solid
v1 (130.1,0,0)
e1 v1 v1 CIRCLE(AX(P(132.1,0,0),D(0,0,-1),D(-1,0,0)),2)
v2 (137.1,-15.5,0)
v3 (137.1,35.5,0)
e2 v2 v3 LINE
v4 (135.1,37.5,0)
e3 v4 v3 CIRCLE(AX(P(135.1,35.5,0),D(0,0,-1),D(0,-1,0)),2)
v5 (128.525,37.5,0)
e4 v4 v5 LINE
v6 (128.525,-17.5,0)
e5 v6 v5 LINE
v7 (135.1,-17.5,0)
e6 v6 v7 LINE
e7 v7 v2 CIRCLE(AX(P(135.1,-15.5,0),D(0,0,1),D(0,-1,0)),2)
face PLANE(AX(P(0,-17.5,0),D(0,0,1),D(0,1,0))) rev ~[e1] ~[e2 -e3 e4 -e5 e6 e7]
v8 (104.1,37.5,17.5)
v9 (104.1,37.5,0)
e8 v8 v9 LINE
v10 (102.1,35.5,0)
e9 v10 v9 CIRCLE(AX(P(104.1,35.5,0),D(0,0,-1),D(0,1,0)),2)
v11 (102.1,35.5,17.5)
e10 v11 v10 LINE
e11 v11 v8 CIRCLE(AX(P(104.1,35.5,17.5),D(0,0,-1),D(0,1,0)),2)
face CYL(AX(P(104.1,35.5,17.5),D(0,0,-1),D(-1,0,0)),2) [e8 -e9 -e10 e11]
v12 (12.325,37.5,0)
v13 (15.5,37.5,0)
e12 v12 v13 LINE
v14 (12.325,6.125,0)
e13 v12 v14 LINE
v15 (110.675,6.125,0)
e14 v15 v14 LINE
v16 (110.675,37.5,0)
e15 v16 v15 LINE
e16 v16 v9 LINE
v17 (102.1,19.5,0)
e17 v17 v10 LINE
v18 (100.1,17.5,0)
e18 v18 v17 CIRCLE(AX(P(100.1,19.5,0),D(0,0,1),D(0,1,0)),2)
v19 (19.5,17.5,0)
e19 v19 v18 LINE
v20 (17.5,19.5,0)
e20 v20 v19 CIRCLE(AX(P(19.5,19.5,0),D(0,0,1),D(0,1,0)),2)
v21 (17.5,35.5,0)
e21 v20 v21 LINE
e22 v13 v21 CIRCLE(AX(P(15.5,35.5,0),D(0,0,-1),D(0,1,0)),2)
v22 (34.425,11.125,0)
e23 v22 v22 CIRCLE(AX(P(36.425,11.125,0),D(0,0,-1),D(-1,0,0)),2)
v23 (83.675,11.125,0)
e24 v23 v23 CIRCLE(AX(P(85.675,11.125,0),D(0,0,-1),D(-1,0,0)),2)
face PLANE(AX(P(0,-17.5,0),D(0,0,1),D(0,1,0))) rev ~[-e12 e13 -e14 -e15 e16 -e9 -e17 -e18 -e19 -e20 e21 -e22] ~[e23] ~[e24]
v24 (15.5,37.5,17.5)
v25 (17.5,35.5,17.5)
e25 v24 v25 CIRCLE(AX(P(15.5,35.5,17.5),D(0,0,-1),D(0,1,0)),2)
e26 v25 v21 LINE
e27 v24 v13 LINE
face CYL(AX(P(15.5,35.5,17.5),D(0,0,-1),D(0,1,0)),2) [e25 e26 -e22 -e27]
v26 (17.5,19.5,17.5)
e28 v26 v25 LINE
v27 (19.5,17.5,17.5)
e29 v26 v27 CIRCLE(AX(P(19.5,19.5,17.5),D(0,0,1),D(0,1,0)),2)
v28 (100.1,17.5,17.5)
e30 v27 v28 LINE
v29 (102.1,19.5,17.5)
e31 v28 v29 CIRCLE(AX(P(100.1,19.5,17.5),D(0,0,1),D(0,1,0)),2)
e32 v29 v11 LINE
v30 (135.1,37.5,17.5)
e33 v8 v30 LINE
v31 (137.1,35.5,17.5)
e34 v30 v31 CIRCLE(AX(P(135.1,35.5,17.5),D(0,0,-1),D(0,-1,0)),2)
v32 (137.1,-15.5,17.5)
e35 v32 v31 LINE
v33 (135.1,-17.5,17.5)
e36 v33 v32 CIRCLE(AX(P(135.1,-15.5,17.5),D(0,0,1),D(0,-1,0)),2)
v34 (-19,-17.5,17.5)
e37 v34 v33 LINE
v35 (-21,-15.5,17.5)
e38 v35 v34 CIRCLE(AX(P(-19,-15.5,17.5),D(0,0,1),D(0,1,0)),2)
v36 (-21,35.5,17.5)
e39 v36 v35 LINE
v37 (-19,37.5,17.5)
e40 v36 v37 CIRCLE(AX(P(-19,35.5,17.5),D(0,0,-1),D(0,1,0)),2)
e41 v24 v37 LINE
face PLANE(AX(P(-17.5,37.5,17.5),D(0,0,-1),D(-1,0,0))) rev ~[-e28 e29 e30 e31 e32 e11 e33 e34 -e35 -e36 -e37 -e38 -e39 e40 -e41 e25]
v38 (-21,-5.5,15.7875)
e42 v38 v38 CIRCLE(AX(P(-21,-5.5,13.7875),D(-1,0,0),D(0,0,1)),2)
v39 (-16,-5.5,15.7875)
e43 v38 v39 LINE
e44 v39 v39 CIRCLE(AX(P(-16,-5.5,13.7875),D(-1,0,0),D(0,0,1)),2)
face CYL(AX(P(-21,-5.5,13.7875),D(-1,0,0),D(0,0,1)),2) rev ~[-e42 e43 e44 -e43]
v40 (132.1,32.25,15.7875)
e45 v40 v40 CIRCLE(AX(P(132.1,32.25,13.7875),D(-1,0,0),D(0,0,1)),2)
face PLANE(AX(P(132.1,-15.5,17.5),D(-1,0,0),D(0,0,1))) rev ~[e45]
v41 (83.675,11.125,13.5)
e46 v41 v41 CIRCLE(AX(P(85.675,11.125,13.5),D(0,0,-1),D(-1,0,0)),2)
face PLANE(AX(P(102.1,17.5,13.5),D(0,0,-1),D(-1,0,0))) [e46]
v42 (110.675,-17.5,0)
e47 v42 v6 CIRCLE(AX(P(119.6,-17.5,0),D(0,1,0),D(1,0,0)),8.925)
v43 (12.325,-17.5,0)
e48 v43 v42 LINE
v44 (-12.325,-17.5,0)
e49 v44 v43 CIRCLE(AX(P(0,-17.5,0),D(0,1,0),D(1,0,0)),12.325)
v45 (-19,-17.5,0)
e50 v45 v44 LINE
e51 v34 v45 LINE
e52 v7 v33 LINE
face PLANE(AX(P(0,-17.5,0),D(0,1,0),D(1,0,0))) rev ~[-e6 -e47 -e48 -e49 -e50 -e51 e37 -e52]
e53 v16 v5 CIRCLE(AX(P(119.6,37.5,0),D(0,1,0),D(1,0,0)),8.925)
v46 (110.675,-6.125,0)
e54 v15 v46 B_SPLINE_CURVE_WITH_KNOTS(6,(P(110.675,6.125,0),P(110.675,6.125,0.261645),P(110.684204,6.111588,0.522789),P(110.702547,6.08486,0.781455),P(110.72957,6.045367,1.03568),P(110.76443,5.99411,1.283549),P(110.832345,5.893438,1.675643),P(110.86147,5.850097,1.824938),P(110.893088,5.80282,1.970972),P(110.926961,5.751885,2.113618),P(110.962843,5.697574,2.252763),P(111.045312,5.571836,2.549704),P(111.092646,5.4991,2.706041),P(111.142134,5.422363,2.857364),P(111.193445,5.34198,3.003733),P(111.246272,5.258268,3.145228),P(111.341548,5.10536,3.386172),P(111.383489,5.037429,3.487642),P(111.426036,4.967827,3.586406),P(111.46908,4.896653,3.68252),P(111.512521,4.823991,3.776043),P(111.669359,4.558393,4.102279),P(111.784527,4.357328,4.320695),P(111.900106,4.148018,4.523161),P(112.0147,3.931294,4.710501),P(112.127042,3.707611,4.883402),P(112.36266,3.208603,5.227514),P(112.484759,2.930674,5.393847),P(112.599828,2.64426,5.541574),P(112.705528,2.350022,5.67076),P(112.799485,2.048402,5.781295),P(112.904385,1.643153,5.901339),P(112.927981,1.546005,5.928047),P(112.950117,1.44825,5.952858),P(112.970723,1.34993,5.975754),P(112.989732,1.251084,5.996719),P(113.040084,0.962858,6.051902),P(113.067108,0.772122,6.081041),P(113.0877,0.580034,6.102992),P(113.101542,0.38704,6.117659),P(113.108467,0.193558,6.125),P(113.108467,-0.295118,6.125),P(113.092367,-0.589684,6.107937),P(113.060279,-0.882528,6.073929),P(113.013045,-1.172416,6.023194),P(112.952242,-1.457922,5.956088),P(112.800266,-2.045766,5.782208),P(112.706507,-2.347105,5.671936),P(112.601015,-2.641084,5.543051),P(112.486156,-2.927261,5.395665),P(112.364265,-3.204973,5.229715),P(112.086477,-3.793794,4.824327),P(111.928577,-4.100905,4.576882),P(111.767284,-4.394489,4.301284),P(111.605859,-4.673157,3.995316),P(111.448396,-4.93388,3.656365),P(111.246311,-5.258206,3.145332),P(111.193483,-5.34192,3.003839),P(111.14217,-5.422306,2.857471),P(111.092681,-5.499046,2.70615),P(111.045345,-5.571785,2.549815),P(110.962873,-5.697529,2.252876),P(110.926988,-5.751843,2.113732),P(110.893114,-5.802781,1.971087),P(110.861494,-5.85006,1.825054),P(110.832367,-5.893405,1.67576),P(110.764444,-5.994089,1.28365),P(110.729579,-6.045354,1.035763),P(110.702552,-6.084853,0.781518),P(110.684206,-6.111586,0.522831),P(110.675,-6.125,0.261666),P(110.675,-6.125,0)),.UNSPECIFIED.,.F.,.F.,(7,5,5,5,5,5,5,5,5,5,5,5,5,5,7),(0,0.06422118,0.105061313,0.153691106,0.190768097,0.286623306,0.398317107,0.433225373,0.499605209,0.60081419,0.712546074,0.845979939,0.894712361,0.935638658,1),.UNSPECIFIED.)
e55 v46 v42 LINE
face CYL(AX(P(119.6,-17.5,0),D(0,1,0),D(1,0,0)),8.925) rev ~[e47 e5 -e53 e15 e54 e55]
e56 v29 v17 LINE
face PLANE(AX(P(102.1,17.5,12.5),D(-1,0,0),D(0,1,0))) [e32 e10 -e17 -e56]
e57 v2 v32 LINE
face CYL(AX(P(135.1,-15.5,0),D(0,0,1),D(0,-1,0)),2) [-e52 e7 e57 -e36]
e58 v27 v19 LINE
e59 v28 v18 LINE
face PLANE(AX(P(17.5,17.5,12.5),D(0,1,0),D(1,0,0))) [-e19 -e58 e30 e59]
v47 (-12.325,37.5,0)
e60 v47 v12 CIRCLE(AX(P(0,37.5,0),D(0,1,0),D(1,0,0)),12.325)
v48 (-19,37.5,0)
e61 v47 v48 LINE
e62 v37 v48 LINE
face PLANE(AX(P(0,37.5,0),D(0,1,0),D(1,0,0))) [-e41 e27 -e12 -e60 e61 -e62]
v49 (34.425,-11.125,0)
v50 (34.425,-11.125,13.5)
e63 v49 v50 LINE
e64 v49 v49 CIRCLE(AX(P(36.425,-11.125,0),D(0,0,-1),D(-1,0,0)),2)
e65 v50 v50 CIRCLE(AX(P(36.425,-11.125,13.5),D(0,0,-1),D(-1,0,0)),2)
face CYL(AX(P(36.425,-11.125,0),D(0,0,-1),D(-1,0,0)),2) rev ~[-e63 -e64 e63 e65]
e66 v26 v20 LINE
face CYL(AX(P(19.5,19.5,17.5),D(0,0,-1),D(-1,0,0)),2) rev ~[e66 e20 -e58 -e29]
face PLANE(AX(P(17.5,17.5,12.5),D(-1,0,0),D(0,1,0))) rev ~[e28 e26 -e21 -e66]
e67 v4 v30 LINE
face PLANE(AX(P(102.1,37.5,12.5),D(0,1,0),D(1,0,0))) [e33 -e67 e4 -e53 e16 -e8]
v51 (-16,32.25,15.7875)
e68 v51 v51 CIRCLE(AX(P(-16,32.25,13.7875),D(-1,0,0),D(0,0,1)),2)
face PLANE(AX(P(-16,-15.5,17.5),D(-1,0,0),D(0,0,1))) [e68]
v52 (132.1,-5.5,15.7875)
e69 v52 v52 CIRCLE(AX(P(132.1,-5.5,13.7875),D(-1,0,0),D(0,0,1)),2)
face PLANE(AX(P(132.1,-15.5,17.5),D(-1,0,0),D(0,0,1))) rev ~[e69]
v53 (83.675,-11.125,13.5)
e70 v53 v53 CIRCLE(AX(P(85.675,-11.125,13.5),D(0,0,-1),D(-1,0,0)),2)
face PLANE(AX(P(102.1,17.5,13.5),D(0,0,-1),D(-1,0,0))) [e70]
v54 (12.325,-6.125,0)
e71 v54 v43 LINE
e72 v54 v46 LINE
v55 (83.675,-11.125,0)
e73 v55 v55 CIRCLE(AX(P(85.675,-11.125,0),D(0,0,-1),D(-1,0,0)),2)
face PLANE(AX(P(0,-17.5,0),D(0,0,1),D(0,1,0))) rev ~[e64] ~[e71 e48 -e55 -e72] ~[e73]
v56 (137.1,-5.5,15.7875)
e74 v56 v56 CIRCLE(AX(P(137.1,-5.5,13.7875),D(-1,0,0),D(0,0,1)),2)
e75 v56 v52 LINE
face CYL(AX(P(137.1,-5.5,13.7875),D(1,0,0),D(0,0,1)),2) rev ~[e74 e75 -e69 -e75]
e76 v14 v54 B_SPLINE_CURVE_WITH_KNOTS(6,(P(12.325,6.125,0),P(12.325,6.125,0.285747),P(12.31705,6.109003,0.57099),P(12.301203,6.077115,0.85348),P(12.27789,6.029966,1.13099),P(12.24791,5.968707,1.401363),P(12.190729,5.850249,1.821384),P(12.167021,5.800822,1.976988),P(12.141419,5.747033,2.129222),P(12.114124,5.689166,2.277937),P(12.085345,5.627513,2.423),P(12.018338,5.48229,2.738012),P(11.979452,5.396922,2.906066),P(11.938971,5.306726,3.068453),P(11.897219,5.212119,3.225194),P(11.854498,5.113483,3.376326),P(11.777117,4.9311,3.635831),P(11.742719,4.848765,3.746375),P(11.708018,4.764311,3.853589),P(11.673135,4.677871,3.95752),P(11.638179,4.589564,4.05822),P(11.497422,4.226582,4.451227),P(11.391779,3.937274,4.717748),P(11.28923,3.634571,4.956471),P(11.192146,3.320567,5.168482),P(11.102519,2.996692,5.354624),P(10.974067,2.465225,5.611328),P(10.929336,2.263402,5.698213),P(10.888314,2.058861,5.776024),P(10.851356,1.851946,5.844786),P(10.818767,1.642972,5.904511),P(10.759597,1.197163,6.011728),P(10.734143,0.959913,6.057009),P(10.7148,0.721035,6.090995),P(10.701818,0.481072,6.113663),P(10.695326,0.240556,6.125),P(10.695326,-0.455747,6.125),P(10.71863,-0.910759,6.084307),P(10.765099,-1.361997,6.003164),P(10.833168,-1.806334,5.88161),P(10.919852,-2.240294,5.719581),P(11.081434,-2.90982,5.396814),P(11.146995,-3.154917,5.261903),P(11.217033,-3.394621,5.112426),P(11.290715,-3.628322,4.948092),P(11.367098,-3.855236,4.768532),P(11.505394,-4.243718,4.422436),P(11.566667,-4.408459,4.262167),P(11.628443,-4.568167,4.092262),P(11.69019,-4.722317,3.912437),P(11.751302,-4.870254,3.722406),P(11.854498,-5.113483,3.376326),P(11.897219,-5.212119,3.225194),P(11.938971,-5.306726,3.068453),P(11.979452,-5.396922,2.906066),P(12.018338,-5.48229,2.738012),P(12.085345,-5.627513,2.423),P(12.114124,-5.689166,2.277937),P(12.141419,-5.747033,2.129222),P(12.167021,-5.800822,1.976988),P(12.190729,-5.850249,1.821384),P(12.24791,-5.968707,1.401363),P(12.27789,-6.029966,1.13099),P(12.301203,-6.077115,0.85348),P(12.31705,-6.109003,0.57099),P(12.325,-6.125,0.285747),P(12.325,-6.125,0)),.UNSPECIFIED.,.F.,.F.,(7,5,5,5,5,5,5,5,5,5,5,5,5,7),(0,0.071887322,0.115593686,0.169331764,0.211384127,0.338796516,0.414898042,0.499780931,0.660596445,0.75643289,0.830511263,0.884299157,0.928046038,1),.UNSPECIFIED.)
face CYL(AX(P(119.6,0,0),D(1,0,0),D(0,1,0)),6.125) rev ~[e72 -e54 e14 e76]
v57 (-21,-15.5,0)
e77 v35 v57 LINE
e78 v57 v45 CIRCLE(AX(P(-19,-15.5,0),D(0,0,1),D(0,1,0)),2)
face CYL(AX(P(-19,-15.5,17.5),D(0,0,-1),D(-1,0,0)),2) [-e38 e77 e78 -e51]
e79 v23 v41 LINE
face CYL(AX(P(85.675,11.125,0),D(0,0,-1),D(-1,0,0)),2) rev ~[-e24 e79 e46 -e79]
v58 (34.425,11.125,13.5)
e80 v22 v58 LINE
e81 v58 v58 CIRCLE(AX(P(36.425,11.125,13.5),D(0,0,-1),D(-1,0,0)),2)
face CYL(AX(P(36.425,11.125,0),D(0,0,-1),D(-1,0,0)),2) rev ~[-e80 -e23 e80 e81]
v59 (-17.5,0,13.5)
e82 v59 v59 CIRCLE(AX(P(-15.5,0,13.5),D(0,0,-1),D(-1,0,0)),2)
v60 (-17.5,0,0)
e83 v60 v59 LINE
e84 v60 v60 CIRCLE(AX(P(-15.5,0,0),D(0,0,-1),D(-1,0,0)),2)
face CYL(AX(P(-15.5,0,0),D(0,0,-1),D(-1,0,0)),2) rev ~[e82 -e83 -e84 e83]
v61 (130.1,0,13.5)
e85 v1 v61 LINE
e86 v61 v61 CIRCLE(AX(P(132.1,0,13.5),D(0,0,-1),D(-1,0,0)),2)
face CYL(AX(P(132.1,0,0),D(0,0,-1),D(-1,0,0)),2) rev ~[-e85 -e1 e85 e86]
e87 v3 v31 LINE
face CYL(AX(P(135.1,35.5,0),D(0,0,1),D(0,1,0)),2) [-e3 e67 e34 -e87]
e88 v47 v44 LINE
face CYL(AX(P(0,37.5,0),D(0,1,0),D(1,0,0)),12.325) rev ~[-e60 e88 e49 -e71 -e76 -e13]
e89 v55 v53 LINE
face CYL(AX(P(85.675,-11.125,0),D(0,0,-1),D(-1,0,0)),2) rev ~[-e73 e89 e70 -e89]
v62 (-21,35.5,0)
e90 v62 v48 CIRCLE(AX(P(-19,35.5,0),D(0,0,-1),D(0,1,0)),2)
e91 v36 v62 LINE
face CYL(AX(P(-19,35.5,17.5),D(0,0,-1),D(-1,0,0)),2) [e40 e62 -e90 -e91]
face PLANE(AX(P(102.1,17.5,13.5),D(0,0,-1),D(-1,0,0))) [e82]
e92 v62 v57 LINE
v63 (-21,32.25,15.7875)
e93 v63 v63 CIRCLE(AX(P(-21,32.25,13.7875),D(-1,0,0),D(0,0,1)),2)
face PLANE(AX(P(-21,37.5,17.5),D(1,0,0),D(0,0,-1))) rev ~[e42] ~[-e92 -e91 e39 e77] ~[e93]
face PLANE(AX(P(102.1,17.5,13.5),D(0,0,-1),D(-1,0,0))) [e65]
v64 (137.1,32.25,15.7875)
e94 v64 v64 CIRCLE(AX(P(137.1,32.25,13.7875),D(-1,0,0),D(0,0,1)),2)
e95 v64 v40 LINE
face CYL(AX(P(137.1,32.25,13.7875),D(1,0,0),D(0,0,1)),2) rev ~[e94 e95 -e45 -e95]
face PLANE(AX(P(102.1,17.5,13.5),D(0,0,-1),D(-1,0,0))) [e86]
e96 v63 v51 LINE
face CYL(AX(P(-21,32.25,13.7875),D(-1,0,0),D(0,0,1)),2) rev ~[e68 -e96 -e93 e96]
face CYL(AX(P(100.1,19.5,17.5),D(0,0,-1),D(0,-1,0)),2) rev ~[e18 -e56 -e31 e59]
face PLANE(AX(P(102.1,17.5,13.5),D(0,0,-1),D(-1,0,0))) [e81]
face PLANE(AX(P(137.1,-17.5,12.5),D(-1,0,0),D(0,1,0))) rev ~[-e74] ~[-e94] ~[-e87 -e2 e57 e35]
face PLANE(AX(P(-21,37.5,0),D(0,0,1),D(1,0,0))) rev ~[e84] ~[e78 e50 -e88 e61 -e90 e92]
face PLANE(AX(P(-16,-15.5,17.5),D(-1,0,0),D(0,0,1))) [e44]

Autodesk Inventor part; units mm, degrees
ref_plane "YZ Plane" through (0, 0, 0) normal (1, 0, 0) x (0, 1, 0)
ref_plane "XZ Plane" through (0, 0, 0) normal (0, 1, 0) x (-1, 0, 0)
ref_plane "XY Plane" through (0, 0, 0) normal (0, 0, 1) x (1, 0, 0)
sketch "Sketch1" plane through (0, 0, 0) normal (0, 0, 1) x (1, 0, 0)
  line L0 (0, 0) -> (119.6, 0)
  line L1 (119.6, 0) -> (119.6, 150)
  line L2 (119.6, 150) -> (0, 150)
  line L3 (0, 150) -> (0, 0)
  dimension "d0" = 119.6
  dimension "d1" = 150
sketch "Sketch2" plane through (0, 0, 0) normal (1, 0, 0) x (0, 1, 0)
  circle A0 centre (0, 0) radius 12.5
  circle A1 centre (0, 0) radius 6.125
  line L0 (-12.5, 0) -> (12.5, 0)
  line L1 (12.5, 0) -> (12.5, 12.5)
  line L2 (12.5, 12.5) -> (-12.5, 12.5)
  line L3 (-12.5, 12.5) -> (-12.5, 0)
  circle A2 centre (150, 0) radius 12.5
  circle A3 centre (150, 0) radius 6.125
  line L4 (137.5, 0) -> (162.5, 0)
  line L5 (162.5, 0) -> (162.5, 12.5)
  line L6 (162.5, 12.5) -> (137.5, 12.5)
  line L7 (137.5, 12.5) -> (137.5, 0)
  line L8 (-12.5, 12.5) -> (-17.5, 12.5)
  line L9 (-17.5, 12.5) -> (-17.5, 0)
  line L10 (-17.5, 0) -> (-12.5, 0)
  line L11 (-12.5, 0) -> (-12.5, 12.5)
  line L12 (12.5, 12.5) -> (17.5, 12.5)
  line L13 (17.5, 12.5) -> (17.5, 0)
  line L14 (17.5, 0) -> (12.5, 0)
  line L15 (12.5, 0) -> (12.5, 12.5)
  point P0 (6.125, 0)
  point P1 (-6.125, 0)
  point P2 (150, 0)
  point P3 (12.5, 0)
  dimension "d2" = 25
  dimension "d3" = 12.25
  dimension "d6" = 5
  dimension "d7" = 5
  dimension "d8" = 35
extrude "Extrusion1" add sketch "Sketch2" along normal up to surface (119.6 mm away) contours L3 L2 A0 | A0 L0 A1 | L10 L9 L8 L3 | A0 L2 L1 | L1 L12 L13 L14 | A1 L0 picked at (10.2705, 0.9272) picked at (1.5282, 2.3311)
ref_plane "Work Plane1" through (59.8, 0, 0) normal (-1, 0, 0) x (0, 0, 1)
sketch "Sketch3" plane through (0, -17.5, 0) normal (0, -1, 0) x (1, 0, 0)
  line L0 (0, 12.5) -> (119.6, 12.5) projected
  line L1 (102.1, 12.5) -> (137.1, 12.5)
  line L2 (137.1, 12.5) -> (137.1, 0)
  line L3 (137.1, 0) -> (102.1, 0)
  line L4 (102.1, 0) -> (102.1, 12.5)
  line L5 (119.6, 12.5) -> (119.6, 0) projected
  circle A0 centre (119.6, 0) radius 8.925
  point P0 (0, 0)
  point P1 (119.6, 12.5)
  point P2 (128.525, 0)
  point P3 (110.675, 0)
  dimension "d9" = 35
  dimension "d33" = 17.85
extrude "Extrusion2" add sketch "Sketch3" against normal blind 55 contours L0 L5 A0 L3 L4 | L1 L2 L3 A0 L5 | A0 L3 L5 | L5 L3 A0
extrude "Extrusion4" cut sketch "Sketch3" along normal through all both and the other way through all contours A0 L3 L5 | L5 L3 A0
extrude "Extrusion3" cut sketch "Sketch2" along normal up to surface (119.6 mm away) contours A1 L0 picked at (1.5282, 2.3311)
mirror "Mirror1" about plane through (59.8, 0, 0) normal (-1, 0, 0) of "Extrusion2", "Extrusion4", "Extrusion3"
sketch "Sketch4" plane through (102.1, 17.5, 12.5) normal (0, 0, 1) x (1, 0, 0)
  line L0 (-119.6, -35) -> (35, -35) projected
  line L1 (0, 20) -> (35, 20) projected
  line L2 (0, 0) -> (0, 20) projected
  line L3 (-84.6, 0) -> (0, 0) projected
  line L4 (-84.6, 0) -> (-84.6, 20) projected
  line L5 (-84.6, 20) -> (-119.6, 20) projected
  line L6 (35, -35) -> (35, 20) projected
  line L7 (-119.6, -35) -> (-119.6, 20) projected
  point P0 (-102.1, -17.5)
extrude "Extrusion5" add sketch "Sketch4" along normal blind 5
sketch "Sketch5" plane through (102.1, 17.5, 0) normal (0, 0, -1) x (-1, 0, 0)
  circle A0 centre (16.425, -6.375) radius 2
  line L0 (-8.575, -11.375) -> (93.175, -11.375) projected
  line L1 (-8.575, 20) -> (-8.575, -11.375) projected
  circle A1 centre (65.675, -6.375) radius 2
  circle A2 centre (16.425, -28.625) radius 2
  circle A3 centre (65.675, -28.625) radius 2
  line L2 (93.175, -35) -> (93.175, -23.625) projected
  line L3 (93.175, -23.625) -> (-8.575, -23.625) projected
  circle A4 centre (-30, -17.5) radius 2
  circle A5 centre (117.6, -17.5) radius 2
  line L4 (-35, -35) -> (-35, 20) projected
  line L5 (119.6, -35) -> (119.6, 20) projected
  line L6 (16.425, -6.375) -> (16.425, -28.625) construction
  point P0 (102.1, -17.5)
  point P1 (16.425, -17.5)
  dimension "d18" = 4
  dimension "d19" = 5
  dimension "d20" = 25
  dimension "d23" = 49.25
  dimension "d26" = 22.25
  dimension "d29" = 27.5
  dimension "d30" = 5
  dimension "d38" = 5
  dimension "d39" = 2
extrude "Extrusion6" cut sketch "Sketch5" against normal blind 13.5
sketch "Sketch6" plane through (0, 37.5, 0) normal (0, 1, 0) x (1, 0, 0)
  circle A0 centre (0, 0) radius 12.325
  line L0 (-17.5, 0) -> (-17.5, -17.5) projected
  line L1 (-17.5, -17.5) -> (-21, -17.5)
  line L2 (-21, -17.5) -> (-21, 0)
  line L3 (-21, 0) -> (-17.5, 0)
  line L4 (-17.5, 0) -> (-17.5, -17.5)
  line L5 (-17.5, 0) -> (-8.925, 0) projected
  dimension "d34" = 24.65
  dimension "d40" = 3.5
extrude "Extrusion7" cut sketch "Sketch6" against normal through all contours A0
extrude "Extrusion8" add sketch "Sketch6" against normal up to surface (55 mm away) contours L0 L1 L2 L3
fillet "Fillet1" radius 2 8 edges at (102.1, 17.5, 8.75) (17.5, 17.5, 8.75) (17.5, 37.5, 8.75) (102.1, 37.5, 8.75) (137.1, 37.5, 8.75) (137.1, -17.5, 8.75) (-21, 37.5, 8.75) (-21, -17.5, 8.75)
sketch "Sketch7" plane through (-21, -15.5, 17.5) normal (-1, 0, 0) x (0, 0, 1)
  circle A0 centre (-3.7125, 10) radius 2
  line L0 (0, 51) -> (0, 0) projected
  line L1 (-17.5, -2) -> (0, -2) projected
  circle A1 centre (-3.7125, 47.75) radius 2
  point P0 (-17.5, 15.5)
  dimension "d43" = 4
  dimension "d44" = 3.7125
  dimension "d45" = 12
  dimension "d49" = 37.75
extrude "Extrusion9" cut sketch "Sketch7" against normal blind 5
extrude "Extrusion10" cut sketch "Sketch7" along normal blind 5 from surface at -158.1
equation "\"d7\" = d6"
equation "\"d9\" = d8"
properties part number "BottomBase"
